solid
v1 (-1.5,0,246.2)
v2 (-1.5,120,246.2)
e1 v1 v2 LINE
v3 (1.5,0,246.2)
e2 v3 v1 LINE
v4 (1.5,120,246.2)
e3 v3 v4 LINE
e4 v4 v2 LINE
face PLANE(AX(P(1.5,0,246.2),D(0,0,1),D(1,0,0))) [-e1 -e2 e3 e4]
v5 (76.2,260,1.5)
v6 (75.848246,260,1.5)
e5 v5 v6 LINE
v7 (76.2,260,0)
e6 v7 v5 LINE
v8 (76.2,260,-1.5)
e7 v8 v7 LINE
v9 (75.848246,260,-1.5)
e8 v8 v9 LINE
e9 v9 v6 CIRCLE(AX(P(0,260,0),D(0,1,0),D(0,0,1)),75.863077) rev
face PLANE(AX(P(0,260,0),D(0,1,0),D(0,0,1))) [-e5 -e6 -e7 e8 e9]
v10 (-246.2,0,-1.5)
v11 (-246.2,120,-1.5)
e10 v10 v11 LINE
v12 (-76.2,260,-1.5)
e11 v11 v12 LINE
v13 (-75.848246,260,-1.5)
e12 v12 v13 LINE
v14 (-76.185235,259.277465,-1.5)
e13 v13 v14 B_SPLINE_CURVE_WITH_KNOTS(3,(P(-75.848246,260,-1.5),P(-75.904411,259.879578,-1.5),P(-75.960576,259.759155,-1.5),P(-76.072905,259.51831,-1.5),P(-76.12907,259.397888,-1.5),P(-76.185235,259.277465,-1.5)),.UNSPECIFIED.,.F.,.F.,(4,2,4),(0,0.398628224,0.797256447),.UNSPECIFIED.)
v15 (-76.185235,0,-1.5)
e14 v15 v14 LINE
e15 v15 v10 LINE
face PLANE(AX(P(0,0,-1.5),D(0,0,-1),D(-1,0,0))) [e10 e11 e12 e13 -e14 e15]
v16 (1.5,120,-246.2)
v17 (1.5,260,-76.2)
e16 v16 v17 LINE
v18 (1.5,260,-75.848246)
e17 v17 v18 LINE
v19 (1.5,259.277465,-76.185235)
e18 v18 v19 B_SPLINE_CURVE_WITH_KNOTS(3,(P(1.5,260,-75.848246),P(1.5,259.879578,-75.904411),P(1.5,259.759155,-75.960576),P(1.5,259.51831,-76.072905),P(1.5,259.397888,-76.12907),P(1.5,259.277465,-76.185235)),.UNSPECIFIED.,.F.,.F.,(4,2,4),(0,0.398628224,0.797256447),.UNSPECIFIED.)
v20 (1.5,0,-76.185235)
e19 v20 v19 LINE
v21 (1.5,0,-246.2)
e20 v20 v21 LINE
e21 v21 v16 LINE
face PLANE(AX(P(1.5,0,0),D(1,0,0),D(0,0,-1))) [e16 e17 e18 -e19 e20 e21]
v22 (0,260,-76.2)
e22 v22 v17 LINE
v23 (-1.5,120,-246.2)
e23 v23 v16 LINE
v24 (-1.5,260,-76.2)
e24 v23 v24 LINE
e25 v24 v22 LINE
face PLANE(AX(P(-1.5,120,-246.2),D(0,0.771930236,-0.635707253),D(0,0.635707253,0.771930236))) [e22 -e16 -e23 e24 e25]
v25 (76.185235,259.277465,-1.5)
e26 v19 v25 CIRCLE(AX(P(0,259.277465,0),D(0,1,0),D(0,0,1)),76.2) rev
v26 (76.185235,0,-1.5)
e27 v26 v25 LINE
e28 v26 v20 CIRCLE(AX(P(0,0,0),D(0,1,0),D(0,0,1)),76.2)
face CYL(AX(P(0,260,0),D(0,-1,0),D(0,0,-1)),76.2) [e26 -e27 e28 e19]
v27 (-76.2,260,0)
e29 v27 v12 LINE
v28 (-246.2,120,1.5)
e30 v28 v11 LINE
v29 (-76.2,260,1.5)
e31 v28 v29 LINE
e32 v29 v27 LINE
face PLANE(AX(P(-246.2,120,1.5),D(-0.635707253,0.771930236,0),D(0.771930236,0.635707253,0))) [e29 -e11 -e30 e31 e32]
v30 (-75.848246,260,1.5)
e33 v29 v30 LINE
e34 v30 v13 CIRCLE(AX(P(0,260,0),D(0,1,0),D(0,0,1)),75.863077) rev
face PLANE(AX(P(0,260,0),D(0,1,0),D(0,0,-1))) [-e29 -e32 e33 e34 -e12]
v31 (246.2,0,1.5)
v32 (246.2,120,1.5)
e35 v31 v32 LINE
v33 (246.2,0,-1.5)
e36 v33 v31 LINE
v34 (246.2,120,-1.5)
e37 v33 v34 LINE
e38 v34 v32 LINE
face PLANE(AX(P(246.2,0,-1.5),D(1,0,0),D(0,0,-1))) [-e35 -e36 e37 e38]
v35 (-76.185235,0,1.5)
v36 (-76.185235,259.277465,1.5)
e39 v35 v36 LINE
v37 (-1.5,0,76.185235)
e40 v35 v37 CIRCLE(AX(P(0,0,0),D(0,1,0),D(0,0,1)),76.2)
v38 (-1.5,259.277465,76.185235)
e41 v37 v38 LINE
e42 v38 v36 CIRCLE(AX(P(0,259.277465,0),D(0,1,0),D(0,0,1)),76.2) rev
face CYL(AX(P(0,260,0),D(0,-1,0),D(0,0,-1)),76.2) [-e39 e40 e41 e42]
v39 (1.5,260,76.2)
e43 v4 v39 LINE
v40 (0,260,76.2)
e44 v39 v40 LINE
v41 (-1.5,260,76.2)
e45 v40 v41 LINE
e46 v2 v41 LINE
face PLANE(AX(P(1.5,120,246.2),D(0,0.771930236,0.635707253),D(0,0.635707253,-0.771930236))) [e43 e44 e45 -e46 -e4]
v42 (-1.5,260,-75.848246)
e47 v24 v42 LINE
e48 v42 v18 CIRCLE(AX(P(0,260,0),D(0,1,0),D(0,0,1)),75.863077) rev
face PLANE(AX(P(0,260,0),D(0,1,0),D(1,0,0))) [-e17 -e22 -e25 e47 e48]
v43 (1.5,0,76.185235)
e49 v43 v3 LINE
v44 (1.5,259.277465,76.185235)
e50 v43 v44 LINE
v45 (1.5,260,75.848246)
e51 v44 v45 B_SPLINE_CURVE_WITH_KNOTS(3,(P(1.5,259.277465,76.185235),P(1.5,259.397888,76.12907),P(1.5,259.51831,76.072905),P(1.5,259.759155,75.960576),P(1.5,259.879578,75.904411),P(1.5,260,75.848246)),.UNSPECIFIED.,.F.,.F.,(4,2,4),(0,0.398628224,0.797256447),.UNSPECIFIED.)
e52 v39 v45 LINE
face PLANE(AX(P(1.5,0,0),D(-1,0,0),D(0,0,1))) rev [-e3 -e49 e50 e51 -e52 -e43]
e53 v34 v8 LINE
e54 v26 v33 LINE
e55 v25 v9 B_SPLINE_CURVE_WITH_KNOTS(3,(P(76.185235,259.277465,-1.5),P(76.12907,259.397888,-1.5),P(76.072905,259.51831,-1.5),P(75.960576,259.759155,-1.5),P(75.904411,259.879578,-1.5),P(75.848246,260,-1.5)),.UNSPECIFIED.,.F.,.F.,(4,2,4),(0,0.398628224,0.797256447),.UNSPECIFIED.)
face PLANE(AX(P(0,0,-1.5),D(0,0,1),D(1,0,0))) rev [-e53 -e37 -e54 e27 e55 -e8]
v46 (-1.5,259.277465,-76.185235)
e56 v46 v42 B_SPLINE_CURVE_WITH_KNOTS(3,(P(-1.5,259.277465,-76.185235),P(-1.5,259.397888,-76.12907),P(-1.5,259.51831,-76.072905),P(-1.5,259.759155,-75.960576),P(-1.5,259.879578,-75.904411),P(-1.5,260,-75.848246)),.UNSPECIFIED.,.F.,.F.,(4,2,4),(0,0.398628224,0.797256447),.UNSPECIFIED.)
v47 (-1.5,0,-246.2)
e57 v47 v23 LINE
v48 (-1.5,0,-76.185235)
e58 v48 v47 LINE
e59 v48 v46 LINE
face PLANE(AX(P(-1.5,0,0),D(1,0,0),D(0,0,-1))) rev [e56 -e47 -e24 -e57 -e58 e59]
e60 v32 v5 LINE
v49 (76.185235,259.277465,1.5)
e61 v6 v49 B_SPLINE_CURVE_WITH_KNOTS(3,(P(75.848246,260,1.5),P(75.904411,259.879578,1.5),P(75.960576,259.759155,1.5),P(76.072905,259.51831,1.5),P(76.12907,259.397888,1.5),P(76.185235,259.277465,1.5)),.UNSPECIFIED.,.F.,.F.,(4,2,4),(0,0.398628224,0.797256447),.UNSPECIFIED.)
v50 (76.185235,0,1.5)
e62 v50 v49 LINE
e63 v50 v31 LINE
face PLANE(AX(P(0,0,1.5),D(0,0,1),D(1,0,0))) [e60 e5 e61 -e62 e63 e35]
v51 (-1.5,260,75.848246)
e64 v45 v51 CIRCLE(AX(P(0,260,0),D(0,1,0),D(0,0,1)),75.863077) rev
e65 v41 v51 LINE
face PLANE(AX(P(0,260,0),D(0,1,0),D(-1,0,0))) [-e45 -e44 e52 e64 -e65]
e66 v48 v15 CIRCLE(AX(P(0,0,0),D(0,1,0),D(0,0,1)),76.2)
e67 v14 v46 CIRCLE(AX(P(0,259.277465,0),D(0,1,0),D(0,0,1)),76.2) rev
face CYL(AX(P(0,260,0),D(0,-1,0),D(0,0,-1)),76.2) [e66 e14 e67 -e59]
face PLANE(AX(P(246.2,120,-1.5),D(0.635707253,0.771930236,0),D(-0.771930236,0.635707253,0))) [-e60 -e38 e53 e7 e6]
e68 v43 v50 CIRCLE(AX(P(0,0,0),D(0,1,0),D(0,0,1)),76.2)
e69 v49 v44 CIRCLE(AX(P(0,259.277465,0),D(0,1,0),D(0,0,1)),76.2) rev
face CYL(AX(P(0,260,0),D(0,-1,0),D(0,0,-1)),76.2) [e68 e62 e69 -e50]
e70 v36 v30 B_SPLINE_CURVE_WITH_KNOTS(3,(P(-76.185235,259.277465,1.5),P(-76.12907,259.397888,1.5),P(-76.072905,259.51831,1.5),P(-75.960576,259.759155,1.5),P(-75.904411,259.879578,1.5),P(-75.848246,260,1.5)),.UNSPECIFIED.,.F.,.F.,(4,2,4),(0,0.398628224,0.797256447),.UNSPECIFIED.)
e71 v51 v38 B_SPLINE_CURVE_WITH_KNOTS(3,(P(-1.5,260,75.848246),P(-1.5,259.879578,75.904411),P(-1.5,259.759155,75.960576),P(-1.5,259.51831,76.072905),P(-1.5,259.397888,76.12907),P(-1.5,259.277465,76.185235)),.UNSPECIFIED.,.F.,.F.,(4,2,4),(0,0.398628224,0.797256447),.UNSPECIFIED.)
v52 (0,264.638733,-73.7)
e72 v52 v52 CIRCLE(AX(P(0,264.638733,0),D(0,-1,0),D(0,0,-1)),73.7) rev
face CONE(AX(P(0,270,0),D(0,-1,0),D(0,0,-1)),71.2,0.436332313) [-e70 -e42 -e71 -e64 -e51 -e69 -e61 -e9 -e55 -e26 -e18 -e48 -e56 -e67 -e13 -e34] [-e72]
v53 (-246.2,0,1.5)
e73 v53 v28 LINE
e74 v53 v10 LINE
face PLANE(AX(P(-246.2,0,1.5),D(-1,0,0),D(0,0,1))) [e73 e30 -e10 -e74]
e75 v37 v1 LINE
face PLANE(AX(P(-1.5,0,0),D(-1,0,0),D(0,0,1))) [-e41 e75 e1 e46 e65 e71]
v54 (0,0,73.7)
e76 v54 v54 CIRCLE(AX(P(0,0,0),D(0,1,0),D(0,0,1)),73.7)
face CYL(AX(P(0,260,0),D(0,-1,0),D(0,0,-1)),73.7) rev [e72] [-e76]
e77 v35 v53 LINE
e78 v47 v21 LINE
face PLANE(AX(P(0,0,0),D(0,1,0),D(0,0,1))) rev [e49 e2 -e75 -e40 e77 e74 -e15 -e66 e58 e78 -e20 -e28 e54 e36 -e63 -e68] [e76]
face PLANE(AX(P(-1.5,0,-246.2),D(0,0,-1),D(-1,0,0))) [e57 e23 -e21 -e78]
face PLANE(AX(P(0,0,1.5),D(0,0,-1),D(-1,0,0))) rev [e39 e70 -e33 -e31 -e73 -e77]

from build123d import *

# Parameters (mm, degrees)
SKETCH1_R                = 76.2
SKETCH1_R_2              = 73.7
BOSS_EXTRUDE1_DEPTH      = 260
BOSS_EXTRUDE2_DEPTH      = 1.5
BOSS_EXTRUDE2_DEPTH_BACK = 1.5
BOSS_EXTRUDE3_DEPTH      = 1.5
BOSS_EXTRUDE3_DEPTH_BACK = 1.5
SKETCH4_W                = 2
SKETCH4_H                = 260
CIRPATTERN1_COUNT        = 4
SKETCH6_R                = 73.7
BOSS_EXTRUDE4_DEPTH      = 10
CHAMFER1_START           = 264.638732699
CHAMFER1_2_OUTLINE_R     = 76.2
CHAMFER1_2_OUTLINE_R_2   = 73.7
CHAMFER1_2_DEPTH         = 5.361267301
CHAMFER1_START_2         = 258
CHAMFER1_3_DEPTH         = 2


with BuildPart() as part:
    # Sketch1 → Boss-Extrude1 (new body)
    with BuildSketch(Plane(origin=(0, 0, 0), x_dir=(1, 0, 0), z_dir=(0, 1, 0))):
        with Locations(Location((0, 0, 0), (0, 0, 270))):
            Circle(SKETCH1_R)
        with Locations(Location((0, 0, 0), (0, 0, 270))):
            Circle(SKETCH1_R_2, mode=Mode.SUBTRACT)
    extrude(amount=BOSS_EXTRUDE1_DEPTH)



with BuildPart() as body_2:
    # Sketch2 → Boss-Extrude2 (new, two sides: drawn at the far end of the back side and taken through both)
    with BuildSketch(Plane.XY.offset(-BOSS_EXTRUDE2_DEPTH_BACK)):
        Polygon((76.2, 0), (76.2, 260), (246.2, 120), (246.2, 0), align=None)
    extrude(amount=BOSS_EXTRUDE2_DEPTH + BOSS_EXTRUDE2_DEPTH_BACK)


with BuildPart() as part_1:
    add(part.part)

    add(body_2.part)  # Boss-Extrude3 merges body 2
    # Sketch4 → Boss-Extrude3 (add, two sides: drawn at the far end of the back side and taken through both)
    with BuildSketch(Plane.XY.offset(-BOSS_EXTRUDE3_DEPTH_BACK)):
        with Locations((75.2, 130)):
            Rectangle(SKETCH4_W, SKETCH4_H)
    extrude(amount=BOSS_EXTRUDE3_DEPTH + BOSS_EXTRUDE3_DEPTH_BACK)


with BuildPart() as cirpattern1_1:
    # CirPattern1: pattern copy
    add(part_1.part.rotate(Axis((0, 0, 0), (0, 1, 0)), 1 * 360 / CIRPATTERN1_COUNT))


with BuildPart() as cirpattern1_2:
    # CirPattern1: pattern copy
    add(part_1.part.rotate(Axis((0, 0, 0), (0, 1, 0)), 2 * 360 / CIRPATTERN1_COUNT))


with BuildPart() as cirpattern1_3:
    # CirPattern1: pattern copy
    add(part_1.part.rotate(Axis((0, 0, 0), (0, 1, 0)), 3 * 360 / CIRPATTERN1_COUNT))


with BuildPart() as part_2:
    add(part_1.part)

    add(cirpattern1_1.part)  # Boss-Extrude4 merges CirPattern1_1

    add(cirpattern1_2.part)  # Boss-Extrude4 merges CirPattern1_2

    add(cirpattern1_3.part)  # Boss-Extrude4 merges CirPattern1_3
    # Sketch6 → Boss-Extrude4 (add)
    with BuildSketch(Plane(origin=(0, 260, 0), x_dir=(1, 0, 0), z_dir=(0, 1, 0))):
        with BuildLine():
            ThreePointArc((76.18523479, -1.5), (76.2, 0), (76.18523479, 1.5))
            ThreePointArc((76.18523479, 1.5), (53.881536726, 53.881536726), (1.5, 76.18523479))
            ThreePointArc((1.5, 76.18523479), (0, 76.2), (-1.5, 76.18523479))
            ThreePointArc((-1.5, 76.18523479), (-53.881536726, -53.881536726), (76.18523479, -1.5))
        make_face()
        with Locations(Location((0, 0, 0), (0, 0, 270))):
            Circle(SKETCH6_R, mode=Mode.SUBTRACT)
    extrude(amount=BOSS_EXTRUDE4_DEPTH)

    # Chamfer1: read off the stored shape, not the designer's step
    # Chamfer1 outline → Chamfer1 (revolve, cut)
    with BuildSketch(Plane.XY):
        Polygon((73.7, 264.638732699), (76.2, 259.277465397), (76.2, 264.638732699), align=None)
    revolve(axis=Axis((0, 0, 0), (0, 1, 0)), mode=Mode.SUBTRACT)

    # Chamfer1 2 outline → Chamfer1 2 (cut)
    with BuildSketch(Plane(origin=(0, 0, 0), x_dir=(1, 0, 0), z_dir=(0, 1, 0)).offset(CHAMFER1_START)):
        Circle(CHAMFER1_2_OUTLINE_R)
        Circle(CHAMFER1_2_OUTLINE_R_2, mode=Mode.SUBTRACT)
    extrude(amount=CHAMFER1_2_DEPTH, mode=Mode.SUBTRACT)

    # Chamfer1 3 outline → Chamfer1 3 (add)
    with BuildSketch(Plane(origin=(0, 0, 0), x_dir=(1, 0, 0), z_dir=(0, 1, 0)).offset(CHAMFER1_START_2)):
        with BuildLine():
            ThreePointArc((76.18523479, -1.5), (76.2, 0), (76.18523479, 1.5))
            Line((76.18523479, 1.5), (75.848245783, 1.5))
            ThreePointArc((75.848245783, 1.5), (75.863076582, 0), (75.848245783, -1.5))
            Line((75.848245783, -1.5), (76.18523479, -1.5))
        make_face()
        with BuildLine():
            Line((1.5, 75.848245783), (1.5, 76.18523479))
            ThreePointArc((1.5, 76.18523479), (0, 76.2), (-1.5, 76.18523479))
            Line((-1.5, 76.18523479), (-1.5, 75.848245783))
            ThreePointArc((-1.5, 75.848245783), (0, 75.863076582), (1.5, 75.848245783))
        make_face()
        with BuildLine():
            ThreePointArc((-1.5, -76.18523479), (0, -76.2), (1.5, -76.18523479))
            Line((1.5, -76.18523479), (1.5, -75.848245783))
            ThreePointArc((1.5, -75.848245783), (0, -75.863076582), (-1.5, -75.848245783))
            Line((-1.5, -75.848245783), (-1.5, -76.18523479))
        make_face()
        with BuildLine():
            Line((-75.848245783, 1.5), (-76.18523479, 1.5))
            ThreePointArc((-76.18523479, 1.5), (-76.2, 0), (-76.18523479, -1.5))
            Line((-76.18523479, -1.5), (-75.848245783, -1.5))
            ThreePointArc((-75.848245783, -1.5), (-75.863076582, 0), (-75.848245783, 1.5))
        make_face()
    extrude(amount=CHAMFER1_3_DEPTH)


solid = part_2.part
